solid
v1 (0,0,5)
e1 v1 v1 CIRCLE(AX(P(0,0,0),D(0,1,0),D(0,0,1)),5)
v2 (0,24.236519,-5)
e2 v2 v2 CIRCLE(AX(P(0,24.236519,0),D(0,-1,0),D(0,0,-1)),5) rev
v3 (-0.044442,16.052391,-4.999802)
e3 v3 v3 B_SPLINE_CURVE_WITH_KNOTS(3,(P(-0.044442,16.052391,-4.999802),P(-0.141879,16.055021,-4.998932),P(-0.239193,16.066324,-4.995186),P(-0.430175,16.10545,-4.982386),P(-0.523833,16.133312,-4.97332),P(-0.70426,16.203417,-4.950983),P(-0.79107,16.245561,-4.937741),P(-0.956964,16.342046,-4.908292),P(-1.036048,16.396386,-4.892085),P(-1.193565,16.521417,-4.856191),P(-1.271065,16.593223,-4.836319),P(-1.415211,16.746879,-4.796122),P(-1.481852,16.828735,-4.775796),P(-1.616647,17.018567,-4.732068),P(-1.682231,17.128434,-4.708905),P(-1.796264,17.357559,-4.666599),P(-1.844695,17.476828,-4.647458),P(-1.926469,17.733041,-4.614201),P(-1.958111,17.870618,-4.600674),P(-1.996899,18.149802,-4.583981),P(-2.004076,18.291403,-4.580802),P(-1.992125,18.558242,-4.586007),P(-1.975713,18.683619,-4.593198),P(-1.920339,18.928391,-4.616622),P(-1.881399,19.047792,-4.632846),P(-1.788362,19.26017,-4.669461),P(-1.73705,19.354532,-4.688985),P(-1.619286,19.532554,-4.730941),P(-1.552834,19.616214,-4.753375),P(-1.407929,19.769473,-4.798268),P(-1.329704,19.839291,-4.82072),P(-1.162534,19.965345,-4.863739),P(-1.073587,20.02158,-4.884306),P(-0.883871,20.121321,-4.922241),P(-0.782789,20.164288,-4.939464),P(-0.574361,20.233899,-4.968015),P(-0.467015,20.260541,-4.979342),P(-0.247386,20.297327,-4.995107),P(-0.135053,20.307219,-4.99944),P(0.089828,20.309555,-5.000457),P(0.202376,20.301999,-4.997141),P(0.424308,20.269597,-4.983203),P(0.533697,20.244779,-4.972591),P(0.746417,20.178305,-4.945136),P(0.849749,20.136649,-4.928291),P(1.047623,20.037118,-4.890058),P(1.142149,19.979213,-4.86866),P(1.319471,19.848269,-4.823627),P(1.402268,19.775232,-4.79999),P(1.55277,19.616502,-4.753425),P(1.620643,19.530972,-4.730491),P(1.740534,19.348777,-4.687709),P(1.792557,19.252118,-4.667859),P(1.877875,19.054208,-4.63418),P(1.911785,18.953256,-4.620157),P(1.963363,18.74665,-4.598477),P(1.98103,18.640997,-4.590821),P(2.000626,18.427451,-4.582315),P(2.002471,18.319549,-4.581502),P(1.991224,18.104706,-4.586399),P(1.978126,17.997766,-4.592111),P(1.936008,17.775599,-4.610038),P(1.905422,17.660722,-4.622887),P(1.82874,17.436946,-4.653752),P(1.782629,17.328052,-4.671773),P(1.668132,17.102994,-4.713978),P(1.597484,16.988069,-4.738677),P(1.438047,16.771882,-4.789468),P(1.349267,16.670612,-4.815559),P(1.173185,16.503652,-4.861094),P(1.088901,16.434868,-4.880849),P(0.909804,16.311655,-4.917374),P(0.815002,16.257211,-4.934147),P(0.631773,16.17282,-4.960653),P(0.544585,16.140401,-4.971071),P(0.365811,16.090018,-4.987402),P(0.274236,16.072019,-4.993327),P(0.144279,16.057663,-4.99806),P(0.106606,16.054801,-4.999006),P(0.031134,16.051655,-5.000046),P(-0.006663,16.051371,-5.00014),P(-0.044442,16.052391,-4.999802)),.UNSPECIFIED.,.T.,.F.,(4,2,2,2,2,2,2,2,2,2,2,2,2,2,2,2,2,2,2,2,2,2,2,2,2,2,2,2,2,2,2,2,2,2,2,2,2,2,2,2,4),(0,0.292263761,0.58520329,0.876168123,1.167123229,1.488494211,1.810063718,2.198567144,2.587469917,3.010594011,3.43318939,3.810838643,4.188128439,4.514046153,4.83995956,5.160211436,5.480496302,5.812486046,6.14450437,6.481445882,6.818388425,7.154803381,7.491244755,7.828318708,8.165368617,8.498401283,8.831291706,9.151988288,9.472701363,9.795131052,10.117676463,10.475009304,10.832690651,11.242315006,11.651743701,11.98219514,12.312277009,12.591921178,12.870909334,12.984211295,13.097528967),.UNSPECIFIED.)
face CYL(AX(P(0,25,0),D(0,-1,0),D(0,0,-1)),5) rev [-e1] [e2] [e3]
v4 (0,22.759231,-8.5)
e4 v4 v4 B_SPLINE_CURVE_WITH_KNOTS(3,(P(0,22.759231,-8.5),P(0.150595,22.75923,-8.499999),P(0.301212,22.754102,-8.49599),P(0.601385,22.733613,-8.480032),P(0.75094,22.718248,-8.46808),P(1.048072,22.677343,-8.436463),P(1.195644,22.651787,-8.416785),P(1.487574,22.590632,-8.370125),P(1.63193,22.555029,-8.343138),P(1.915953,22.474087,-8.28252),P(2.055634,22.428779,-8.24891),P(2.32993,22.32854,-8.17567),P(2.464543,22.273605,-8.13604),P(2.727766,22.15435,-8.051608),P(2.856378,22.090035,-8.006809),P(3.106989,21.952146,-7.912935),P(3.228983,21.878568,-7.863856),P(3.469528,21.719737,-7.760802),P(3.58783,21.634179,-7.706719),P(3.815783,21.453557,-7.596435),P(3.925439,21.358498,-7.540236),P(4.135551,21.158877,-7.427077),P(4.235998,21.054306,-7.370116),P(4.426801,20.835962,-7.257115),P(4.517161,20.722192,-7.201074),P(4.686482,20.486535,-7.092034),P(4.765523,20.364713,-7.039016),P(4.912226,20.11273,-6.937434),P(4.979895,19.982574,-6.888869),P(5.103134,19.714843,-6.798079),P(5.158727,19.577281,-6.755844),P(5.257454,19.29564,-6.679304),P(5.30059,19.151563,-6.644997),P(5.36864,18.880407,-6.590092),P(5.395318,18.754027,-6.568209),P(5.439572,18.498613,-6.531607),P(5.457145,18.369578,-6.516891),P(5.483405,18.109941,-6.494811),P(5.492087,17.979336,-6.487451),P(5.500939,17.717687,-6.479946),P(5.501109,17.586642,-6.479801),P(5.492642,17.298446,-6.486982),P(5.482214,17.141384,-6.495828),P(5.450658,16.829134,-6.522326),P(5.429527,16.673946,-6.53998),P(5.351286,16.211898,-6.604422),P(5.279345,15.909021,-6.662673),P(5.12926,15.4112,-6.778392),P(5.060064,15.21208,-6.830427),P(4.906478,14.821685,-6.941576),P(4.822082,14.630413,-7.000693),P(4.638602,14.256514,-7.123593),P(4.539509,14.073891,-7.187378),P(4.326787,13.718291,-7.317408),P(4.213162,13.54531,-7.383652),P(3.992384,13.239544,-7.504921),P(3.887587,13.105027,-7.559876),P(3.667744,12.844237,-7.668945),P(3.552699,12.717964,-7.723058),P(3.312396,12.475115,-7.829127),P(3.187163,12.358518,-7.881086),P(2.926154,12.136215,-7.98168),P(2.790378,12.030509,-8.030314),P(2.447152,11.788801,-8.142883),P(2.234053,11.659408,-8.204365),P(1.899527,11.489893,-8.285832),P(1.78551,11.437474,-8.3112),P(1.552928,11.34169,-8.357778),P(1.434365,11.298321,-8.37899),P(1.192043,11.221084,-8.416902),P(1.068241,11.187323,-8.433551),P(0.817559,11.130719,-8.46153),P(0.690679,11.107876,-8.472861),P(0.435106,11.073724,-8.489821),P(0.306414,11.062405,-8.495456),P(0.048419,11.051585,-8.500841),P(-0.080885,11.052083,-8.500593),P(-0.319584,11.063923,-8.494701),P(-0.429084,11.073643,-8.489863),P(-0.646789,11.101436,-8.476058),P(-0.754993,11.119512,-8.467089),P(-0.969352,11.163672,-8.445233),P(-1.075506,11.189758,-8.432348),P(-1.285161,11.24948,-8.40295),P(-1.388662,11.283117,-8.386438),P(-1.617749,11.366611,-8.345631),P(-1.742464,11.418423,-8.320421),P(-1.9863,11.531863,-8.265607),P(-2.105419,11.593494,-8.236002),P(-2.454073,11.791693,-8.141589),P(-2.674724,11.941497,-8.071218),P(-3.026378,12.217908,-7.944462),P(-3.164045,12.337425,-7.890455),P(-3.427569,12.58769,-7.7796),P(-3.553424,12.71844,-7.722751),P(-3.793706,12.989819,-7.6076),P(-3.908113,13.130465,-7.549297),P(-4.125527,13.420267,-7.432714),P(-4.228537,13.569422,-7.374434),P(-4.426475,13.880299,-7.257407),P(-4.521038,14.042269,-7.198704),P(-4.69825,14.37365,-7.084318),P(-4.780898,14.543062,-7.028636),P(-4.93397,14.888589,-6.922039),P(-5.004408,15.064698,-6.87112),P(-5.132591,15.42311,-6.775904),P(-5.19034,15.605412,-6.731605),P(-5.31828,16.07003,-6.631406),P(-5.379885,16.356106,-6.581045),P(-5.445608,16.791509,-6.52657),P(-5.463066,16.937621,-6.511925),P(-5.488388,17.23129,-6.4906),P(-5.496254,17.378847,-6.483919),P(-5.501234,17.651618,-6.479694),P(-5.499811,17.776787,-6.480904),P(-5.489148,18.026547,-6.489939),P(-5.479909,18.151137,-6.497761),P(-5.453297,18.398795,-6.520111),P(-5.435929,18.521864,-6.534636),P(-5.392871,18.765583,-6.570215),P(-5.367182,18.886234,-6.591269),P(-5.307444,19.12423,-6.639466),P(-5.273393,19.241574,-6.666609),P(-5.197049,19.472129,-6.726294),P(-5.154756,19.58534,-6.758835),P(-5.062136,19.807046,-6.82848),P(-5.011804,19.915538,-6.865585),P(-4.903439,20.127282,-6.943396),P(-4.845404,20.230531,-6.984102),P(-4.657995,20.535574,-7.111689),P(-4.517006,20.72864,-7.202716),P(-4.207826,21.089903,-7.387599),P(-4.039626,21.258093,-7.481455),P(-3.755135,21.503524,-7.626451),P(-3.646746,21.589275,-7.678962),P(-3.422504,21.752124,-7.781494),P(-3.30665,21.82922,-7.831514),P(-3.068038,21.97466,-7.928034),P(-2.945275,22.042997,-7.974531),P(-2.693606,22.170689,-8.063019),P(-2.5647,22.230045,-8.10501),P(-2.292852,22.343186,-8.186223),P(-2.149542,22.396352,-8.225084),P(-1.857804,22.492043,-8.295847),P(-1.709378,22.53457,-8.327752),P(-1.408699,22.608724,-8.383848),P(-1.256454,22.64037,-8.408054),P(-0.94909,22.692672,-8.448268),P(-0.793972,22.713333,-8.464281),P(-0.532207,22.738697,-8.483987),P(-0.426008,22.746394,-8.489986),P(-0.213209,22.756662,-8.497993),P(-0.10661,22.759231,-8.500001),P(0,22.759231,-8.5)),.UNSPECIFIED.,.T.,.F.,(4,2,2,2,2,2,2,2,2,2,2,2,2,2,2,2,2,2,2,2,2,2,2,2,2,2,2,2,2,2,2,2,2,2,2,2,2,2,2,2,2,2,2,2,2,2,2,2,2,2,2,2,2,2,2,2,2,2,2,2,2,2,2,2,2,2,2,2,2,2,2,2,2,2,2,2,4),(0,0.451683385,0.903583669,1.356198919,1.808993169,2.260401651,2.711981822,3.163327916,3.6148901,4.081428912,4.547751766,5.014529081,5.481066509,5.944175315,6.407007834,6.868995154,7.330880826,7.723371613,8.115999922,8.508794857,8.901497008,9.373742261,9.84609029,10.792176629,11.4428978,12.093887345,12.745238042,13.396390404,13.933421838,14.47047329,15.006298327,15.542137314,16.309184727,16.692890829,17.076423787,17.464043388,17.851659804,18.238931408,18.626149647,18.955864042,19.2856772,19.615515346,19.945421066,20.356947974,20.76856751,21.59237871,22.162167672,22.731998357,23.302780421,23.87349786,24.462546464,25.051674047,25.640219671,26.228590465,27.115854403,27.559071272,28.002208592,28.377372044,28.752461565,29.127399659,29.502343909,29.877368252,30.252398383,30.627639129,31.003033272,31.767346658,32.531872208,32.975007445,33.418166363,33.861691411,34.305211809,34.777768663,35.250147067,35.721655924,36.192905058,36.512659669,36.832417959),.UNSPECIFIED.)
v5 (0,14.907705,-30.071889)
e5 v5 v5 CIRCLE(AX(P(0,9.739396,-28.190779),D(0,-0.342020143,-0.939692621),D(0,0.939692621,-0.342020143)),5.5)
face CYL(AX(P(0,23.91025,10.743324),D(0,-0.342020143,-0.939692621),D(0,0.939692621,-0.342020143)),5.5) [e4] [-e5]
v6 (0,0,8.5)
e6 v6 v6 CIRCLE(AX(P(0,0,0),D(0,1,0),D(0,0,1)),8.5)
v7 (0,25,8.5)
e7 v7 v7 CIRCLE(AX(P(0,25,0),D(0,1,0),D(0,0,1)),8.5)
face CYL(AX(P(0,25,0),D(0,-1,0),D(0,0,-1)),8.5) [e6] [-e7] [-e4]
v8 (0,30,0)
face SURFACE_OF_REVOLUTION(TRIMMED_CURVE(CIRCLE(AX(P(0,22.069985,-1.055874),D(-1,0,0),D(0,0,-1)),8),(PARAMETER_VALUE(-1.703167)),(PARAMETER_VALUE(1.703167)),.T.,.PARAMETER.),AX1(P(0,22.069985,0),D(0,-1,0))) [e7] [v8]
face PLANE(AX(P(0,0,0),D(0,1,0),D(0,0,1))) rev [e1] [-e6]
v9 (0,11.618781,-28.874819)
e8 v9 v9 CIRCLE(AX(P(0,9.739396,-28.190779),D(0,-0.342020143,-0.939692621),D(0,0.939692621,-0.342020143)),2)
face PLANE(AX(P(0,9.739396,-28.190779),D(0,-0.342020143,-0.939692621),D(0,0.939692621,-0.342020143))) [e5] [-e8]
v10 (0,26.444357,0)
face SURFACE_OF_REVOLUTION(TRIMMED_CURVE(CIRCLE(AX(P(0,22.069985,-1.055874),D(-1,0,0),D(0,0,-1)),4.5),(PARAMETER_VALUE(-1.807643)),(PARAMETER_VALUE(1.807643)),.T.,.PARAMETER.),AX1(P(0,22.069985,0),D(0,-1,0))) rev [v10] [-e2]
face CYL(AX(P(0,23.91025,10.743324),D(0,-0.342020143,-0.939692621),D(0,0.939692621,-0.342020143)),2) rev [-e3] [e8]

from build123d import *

# Parameters (mm, degrees)
SKETCH1_R                = 8.5
BOSS_EXTRUDE1_DEPTH      = 25
BOSS_EXTRUDE2_REACH      = 44.799
BOSS_EXTRUDE2_END_RADIUS = 8.5
SKETCH4_R                = 5.5
SHELL1_START             = -23.159597133
SHELL1_2_OUTLINE_R       = 2
SHELL1_2_DEPTH           = 26.159597133


with BuildPart() as part:
    # Sketch1 → Boss-Extrude1 (new body)
    with BuildSketch(Plane(origin=(0, 0, 0), x_dir=(1, 0, 0), z_dir=(0, 1, 0))):
        with Locations(Location((0, 0, 0), (0, 0, 270))):
            Circle(SKETCH1_R)
    extrude(amount=BOSS_EXTRUDE1_DEPTH)

    # Sketch2 → Revolve1 (revolve)
    with BuildSketch(Plane(origin=(0, 0, 0), x_dir=(0, 0, -1), z_dir=(1, 0, 0))):
        with BuildLine():
            Line((0, 25), (0, 30))
            ThreePointArc((0, 30), (5.112034816, 28.965459187), (8.5, 25))
            Line((8.5, 25), (0, 25))
        make_face()
    revolve(axis=Axis((0, 25, 0), (0, 1, 0)))

    # Boss-Extrude2: up to this cylinder (the profile starts outside it)
    boss_extrude2_end = Plane(origin=(0, 9.739396, 0), z_dir=(0, -1, 0)) * Cylinder(BOSS_EXTRUDE2_END_RADIUS, 107.598, mode=Mode.PRIVATE)
    # Sketch4 → Boss-Extrude2 (add, up to the surface)
    with BuildSketch(Plane(origin=(0, 9.7393957, -28.190778624), x_dir=(-1, 0, 0), z_dir=(0, -0.3420201433256657, -0.9396926207859096)), mode=Mode.PRIVATE) as boss_extrude2_sk1:
        with Locations(Location((0, 0, 0), (0, 0, 90))):
            Circle(SKETCH4_R)
    boss_extrude2_tool1 = extrude(boss_extrude2_sk1.sketch, amount=-BOSS_EXTRUDE2_REACH, mode=Mode.PRIVATE) - boss_extrude2_end
    add(boss_extrude2_tool1.solids().sort_by_distance((0, 9.739396, -28.190779))[0])

    # Shell1: read off the stored shape, not the designer's step
    # Shell1 outline → Shell1 (revolve, cut)
    with BuildSketch(Plane.XY):
        with BuildLine():
            Line((0, 26.444357479), (0, 0))
            Line((0, 0), (5, 0))
            Line((5, 0), (5, 24.236519229))
            add(Edge.make_bspline(
                [(5, 24.236519229), (4.572818275, 25.014193993), (3.910724446, 25.762107964), (3.017623345, 26.318986428), (2.002643397, 26.569985468), (0.836195706, 26.569985465), (0.619342604, 26.556580246), (0.406891162, 26.530460172), (0.200126847, 26.492663543), (0, 26.444357479)],
                knots=[4.721376583, 4.721376583, 4.721376583, 4.721376583, 4.721376583, 4.721376583, 5.780874766, 5.780874766, 5.780874766, 5.780874766, 6.026709165, 6.026709165, 6.026709165, 6.026709165, 6.026709165, 6.026709165], degree=5, weights=[1, 1, 0.993014221, 0.992005425, 1, 1, 0.999993273, 0.999995808, 1, 1]))
        make_face()
    revolve(axis=Axis((0, 0, 0), (0, 1, 0)), mode=Mode.SUBTRACT)

    # Shell1 2 outline → Shell1 2 (cut)
    with BuildSketch(Plane(origin=(0, 0, 0), x_dir=(1, 0, 0), z_dir=(0, 0.34202014332566616, 0.9396926207859094)).offset(SHELL1_START)):
        with Locations((0, 18.793852416)):
            Circle(SHELL1_2_OUTLINE_R)
    extrude(amount=SHELL1_2_DEPTH, mode=Mode.SUBTRACT)


solid = part.part
